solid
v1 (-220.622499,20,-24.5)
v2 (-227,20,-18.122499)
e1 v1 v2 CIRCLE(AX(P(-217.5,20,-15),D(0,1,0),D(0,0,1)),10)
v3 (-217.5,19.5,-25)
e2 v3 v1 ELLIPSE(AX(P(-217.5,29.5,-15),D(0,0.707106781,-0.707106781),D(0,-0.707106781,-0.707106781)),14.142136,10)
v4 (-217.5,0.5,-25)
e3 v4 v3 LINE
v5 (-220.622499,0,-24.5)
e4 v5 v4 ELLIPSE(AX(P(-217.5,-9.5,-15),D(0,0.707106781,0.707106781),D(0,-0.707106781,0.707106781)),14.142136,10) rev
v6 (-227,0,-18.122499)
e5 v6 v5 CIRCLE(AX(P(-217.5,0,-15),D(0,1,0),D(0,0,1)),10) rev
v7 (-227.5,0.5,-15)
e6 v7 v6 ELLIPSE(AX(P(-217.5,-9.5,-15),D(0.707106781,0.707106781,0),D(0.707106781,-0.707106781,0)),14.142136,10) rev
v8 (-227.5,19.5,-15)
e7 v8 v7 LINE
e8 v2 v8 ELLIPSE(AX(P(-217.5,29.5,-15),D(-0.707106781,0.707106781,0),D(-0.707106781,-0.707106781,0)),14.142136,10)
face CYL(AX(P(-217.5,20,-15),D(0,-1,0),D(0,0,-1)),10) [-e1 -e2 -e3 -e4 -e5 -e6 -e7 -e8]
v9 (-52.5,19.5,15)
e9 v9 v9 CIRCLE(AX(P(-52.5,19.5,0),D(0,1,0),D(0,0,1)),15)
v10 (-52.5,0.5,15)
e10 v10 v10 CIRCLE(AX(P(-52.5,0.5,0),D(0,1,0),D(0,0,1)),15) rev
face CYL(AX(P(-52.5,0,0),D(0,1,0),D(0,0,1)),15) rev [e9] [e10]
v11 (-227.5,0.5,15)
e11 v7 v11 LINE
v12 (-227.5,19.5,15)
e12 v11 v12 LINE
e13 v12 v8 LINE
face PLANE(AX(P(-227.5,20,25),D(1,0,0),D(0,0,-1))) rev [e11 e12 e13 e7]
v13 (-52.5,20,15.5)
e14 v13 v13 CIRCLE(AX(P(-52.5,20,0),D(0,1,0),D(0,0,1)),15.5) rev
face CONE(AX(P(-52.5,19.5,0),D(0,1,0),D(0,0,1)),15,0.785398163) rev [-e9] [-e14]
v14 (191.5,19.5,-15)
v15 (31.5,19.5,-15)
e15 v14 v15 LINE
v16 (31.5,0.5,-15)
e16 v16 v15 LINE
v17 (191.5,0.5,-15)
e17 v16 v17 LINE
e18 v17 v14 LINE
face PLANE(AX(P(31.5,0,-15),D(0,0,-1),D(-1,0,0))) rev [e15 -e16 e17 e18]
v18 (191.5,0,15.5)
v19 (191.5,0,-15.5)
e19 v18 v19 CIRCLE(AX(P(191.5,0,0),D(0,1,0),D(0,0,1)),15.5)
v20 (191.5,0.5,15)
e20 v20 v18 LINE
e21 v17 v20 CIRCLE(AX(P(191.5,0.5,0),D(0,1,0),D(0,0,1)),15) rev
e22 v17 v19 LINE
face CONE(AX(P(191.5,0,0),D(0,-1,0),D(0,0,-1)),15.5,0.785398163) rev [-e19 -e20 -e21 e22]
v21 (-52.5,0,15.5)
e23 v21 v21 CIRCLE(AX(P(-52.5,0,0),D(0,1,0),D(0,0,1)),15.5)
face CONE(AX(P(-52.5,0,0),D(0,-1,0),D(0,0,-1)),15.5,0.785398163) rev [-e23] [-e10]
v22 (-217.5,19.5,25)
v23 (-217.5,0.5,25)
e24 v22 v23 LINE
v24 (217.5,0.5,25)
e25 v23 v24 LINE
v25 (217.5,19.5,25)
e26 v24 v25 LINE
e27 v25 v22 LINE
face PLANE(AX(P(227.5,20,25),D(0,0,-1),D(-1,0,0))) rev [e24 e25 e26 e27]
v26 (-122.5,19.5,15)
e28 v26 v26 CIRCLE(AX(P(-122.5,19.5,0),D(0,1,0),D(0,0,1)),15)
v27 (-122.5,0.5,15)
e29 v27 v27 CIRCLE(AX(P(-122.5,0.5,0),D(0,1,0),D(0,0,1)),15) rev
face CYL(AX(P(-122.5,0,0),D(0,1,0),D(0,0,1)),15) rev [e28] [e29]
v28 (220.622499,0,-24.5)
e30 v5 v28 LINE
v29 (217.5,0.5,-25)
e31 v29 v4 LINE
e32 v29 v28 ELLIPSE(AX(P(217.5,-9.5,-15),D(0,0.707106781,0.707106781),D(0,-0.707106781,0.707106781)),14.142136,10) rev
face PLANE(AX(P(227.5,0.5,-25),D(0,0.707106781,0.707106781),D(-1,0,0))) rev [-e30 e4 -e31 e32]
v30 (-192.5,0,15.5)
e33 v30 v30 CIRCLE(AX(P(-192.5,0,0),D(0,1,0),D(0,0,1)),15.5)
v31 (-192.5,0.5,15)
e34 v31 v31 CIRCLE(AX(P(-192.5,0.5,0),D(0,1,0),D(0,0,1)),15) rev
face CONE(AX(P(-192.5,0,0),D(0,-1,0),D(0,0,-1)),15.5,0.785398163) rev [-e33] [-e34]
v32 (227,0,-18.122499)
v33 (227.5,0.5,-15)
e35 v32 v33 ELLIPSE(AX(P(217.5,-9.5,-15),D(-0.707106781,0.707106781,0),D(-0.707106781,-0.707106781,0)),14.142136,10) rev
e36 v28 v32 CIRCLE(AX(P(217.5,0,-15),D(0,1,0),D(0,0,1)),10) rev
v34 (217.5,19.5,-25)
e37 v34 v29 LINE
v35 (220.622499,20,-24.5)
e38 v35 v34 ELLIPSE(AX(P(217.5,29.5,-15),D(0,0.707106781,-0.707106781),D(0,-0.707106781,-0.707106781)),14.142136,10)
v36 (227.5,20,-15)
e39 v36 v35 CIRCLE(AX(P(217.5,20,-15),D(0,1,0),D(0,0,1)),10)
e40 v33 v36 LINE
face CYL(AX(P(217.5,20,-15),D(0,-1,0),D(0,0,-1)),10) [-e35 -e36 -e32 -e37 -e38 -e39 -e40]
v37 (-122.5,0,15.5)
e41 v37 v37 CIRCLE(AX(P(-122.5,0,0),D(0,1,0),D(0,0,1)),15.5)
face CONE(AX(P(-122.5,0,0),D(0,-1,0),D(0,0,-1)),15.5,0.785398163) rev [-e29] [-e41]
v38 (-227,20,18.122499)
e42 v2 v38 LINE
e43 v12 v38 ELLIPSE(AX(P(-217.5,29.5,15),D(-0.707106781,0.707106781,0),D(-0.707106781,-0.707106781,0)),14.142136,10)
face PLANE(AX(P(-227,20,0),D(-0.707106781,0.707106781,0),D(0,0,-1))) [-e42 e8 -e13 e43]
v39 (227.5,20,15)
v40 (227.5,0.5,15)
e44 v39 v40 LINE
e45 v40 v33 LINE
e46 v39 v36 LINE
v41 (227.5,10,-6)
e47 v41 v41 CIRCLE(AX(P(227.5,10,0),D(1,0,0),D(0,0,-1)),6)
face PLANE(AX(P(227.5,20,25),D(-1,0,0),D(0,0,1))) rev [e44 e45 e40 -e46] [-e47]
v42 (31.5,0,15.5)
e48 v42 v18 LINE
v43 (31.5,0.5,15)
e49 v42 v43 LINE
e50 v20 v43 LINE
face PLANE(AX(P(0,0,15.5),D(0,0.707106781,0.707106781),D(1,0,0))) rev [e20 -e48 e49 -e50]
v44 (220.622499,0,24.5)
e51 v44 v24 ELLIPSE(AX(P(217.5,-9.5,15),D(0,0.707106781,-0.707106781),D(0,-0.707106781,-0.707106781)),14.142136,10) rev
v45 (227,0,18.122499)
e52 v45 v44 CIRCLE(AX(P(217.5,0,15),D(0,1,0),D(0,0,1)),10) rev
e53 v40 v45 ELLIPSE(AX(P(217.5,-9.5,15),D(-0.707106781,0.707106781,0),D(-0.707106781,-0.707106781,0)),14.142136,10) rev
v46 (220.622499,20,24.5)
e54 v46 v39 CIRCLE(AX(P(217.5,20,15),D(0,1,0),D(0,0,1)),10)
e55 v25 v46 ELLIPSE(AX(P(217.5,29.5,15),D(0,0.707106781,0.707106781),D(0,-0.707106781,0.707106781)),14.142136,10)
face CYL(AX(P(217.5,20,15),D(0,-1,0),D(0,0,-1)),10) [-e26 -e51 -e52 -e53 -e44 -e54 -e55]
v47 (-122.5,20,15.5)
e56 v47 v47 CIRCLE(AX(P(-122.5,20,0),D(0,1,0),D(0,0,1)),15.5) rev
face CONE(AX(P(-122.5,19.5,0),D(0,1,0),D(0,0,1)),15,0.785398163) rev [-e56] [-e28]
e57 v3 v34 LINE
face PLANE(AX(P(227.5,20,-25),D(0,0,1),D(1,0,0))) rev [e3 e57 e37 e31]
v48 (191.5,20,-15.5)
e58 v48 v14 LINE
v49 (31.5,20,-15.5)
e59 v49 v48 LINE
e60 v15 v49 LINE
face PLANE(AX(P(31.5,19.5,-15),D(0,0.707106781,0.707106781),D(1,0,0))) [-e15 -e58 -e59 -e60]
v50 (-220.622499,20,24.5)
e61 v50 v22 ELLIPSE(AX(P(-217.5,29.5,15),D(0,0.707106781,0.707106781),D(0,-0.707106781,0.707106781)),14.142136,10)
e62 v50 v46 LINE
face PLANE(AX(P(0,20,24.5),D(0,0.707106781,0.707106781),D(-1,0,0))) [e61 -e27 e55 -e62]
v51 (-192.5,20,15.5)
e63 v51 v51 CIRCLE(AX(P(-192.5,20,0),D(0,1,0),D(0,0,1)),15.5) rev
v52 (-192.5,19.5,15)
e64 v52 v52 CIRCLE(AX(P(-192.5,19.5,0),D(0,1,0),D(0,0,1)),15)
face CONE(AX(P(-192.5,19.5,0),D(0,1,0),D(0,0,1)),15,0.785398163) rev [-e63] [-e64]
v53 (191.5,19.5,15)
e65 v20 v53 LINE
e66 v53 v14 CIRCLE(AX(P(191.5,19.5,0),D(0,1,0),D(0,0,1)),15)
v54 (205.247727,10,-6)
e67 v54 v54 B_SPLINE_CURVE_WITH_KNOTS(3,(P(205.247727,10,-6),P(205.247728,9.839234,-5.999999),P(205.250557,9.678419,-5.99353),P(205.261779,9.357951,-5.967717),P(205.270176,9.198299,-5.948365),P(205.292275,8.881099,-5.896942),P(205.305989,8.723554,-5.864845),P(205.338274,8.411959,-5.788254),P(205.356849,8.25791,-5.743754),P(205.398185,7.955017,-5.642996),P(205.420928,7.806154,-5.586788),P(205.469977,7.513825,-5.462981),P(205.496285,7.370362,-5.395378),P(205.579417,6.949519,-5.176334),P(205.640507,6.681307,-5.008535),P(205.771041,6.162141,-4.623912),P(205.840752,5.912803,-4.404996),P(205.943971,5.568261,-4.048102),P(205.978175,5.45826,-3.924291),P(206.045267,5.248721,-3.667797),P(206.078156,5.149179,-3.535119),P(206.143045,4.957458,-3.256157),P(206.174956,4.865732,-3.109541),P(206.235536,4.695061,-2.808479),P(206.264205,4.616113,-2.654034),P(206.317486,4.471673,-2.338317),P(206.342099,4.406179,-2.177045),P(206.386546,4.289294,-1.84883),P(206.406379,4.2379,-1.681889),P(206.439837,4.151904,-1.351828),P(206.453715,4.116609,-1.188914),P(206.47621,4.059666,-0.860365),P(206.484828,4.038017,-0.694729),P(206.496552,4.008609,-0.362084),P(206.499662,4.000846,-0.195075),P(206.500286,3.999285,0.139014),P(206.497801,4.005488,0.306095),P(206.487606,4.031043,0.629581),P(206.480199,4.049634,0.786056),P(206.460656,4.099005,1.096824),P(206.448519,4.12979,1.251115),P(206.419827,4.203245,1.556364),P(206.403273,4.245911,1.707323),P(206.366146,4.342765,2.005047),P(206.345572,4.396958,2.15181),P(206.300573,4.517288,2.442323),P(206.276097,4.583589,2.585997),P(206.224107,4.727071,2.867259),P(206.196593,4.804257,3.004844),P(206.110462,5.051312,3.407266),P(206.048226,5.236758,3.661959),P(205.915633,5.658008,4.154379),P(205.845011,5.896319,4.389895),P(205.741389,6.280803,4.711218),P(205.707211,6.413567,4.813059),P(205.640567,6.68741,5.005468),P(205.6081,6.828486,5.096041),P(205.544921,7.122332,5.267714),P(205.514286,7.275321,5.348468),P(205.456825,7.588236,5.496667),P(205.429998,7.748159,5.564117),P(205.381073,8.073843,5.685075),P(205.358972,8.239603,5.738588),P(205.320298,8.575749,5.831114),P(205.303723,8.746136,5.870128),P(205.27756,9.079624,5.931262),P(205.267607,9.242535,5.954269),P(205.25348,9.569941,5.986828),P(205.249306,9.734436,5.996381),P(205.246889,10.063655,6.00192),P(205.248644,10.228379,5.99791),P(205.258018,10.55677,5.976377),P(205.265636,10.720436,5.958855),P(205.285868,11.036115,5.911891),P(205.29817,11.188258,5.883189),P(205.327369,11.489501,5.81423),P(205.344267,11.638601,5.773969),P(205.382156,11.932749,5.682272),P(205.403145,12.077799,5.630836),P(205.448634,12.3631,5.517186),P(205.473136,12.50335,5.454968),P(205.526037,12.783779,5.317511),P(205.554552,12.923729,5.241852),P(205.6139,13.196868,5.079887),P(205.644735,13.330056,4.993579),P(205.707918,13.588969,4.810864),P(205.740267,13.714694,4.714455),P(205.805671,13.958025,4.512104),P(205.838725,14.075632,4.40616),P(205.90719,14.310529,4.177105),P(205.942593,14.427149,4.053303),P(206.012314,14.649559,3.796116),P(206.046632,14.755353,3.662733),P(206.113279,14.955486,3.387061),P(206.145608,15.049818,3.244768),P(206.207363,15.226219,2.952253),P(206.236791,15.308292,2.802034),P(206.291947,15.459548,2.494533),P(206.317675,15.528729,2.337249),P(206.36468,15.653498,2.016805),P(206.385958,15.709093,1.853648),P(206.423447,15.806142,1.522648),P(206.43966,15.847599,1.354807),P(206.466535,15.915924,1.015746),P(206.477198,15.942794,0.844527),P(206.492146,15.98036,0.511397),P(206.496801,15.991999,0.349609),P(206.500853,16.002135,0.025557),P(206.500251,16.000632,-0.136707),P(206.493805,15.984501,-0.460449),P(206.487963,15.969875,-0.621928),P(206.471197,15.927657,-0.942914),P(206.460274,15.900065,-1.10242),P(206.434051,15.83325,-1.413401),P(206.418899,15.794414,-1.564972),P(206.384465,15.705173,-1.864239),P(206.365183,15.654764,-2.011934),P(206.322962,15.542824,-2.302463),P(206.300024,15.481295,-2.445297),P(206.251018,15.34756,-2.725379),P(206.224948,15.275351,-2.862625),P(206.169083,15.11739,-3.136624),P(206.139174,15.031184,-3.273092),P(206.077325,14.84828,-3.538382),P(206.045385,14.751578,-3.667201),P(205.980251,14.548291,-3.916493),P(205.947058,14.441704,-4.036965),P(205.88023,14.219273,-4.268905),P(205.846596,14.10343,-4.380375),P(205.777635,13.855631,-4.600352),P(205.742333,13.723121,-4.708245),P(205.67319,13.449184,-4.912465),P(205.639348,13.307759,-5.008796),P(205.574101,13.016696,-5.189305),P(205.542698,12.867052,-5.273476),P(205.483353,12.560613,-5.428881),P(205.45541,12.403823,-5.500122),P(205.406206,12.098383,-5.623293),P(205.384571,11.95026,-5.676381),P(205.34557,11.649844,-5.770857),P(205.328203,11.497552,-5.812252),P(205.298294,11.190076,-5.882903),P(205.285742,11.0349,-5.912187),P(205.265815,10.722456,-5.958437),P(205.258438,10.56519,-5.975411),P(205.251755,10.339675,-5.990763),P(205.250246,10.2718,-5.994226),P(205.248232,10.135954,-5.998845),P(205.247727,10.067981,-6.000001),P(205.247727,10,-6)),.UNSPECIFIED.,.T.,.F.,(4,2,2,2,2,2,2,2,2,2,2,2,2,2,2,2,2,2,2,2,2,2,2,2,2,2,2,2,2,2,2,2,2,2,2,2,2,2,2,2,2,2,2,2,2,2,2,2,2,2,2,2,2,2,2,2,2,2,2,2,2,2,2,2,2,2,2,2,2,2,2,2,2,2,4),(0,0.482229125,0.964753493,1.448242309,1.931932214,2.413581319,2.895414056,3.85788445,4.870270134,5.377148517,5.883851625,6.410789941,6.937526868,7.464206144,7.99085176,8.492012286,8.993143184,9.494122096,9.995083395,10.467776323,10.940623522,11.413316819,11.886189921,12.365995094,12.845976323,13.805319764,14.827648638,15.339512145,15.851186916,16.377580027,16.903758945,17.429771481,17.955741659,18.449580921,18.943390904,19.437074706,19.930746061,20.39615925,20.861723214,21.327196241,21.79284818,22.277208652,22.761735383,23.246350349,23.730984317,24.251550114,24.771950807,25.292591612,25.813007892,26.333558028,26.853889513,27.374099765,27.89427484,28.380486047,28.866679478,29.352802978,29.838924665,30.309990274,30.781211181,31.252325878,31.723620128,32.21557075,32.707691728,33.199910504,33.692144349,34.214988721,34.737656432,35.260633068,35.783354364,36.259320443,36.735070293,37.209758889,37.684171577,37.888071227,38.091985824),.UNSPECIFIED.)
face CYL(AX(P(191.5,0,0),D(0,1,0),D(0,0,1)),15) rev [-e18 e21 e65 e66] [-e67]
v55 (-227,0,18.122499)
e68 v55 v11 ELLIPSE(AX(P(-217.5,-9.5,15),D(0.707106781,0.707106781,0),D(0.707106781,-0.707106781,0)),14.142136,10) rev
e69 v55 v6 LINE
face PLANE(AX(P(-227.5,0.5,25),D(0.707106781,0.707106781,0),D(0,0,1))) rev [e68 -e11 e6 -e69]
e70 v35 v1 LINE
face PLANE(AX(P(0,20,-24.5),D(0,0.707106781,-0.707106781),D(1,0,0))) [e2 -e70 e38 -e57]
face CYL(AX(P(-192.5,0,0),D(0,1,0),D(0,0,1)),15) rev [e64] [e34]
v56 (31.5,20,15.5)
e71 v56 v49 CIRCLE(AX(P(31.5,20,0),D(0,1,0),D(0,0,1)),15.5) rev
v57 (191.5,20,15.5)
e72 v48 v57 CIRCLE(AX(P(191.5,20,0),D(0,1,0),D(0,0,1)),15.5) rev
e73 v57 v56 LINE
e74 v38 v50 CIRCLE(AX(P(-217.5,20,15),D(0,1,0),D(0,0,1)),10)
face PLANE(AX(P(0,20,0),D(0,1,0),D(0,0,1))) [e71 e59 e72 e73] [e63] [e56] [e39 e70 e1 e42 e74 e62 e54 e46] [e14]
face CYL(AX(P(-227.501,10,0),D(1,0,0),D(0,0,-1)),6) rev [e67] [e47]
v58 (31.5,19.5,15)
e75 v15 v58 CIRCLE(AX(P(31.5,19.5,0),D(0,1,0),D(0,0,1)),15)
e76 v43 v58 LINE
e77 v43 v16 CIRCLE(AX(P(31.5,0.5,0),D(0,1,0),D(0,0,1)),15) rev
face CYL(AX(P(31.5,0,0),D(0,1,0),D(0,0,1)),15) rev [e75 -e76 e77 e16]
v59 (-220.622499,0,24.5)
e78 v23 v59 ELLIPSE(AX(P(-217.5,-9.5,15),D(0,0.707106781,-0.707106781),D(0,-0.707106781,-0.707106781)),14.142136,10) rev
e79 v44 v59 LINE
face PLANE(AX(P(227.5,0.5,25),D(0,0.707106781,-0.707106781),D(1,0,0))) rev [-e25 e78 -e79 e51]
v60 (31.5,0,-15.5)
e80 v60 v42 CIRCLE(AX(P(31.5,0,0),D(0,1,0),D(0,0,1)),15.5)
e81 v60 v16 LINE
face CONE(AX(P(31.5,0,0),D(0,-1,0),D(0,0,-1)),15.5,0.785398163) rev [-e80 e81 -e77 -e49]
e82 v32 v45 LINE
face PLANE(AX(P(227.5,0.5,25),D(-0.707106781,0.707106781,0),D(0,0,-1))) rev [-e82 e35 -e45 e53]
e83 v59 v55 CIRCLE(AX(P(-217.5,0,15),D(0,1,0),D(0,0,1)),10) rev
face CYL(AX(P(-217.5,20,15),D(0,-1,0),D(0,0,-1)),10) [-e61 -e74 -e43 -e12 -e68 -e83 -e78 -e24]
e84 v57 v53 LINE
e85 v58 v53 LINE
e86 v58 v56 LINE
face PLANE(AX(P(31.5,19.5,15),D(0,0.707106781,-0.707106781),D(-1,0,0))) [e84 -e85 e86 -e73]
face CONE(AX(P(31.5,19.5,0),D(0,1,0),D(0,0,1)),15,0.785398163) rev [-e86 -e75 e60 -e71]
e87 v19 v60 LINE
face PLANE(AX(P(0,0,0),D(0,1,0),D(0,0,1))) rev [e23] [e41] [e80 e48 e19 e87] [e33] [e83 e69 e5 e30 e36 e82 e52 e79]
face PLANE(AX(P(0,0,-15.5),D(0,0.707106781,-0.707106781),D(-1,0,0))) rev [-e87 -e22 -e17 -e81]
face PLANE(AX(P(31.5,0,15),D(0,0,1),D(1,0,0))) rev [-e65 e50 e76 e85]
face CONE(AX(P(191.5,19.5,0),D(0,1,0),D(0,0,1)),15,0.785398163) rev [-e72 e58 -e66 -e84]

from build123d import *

# Parameters (mm, degrees)
SKETCH_1_W               = 455
SKETCH_1_H               = 50
EXTRUDE_1_DEPTH          = 20
SKETCH_2_R               = 15
CUT_EXTRUDE_1_DEPTH      = 230.741702788
CUT_EXTRUDE_2_REACH      = 458.125
CUT_EXTRUDE_2_END_RADIUS = 15
SKETCH_3_R               = 6
CHAMFER_1_SIZE           = 0.5
CHAMFER_2_SIZE           = 0.5
FILLET_1_R               = 10


with BuildPart() as part:
    # 草图1 → 凸台-拉伸1 (new body)
    with BuildSketch(Plane(origin=(0, 0, 0), x_dir=(1, 0, 0), z_dir=(0, 1, 0))):
        Rectangle(SKETCH_1_W, SKETCH_1_H)
    extrude(amount=EXTRUDE_1_DEPTH)

    # 草图2 → 切除-拉伸1 (cut, through all)
    with BuildSketch(Plane(origin=(0, 20, 0), x_dir=(1, 0, 0), z_dir=(0, 1, 0))):
        with Locations(Location((-192.5, 0, 0), (0, 0, 270))):
            Circle(SKETCH_2_R)
        with Locations(Location((-122.5, 0, 0), (0, 0, 270))):
            Circle(SKETCH_2_R)
        with Locations(Location((-52.5, 0, 0), (0, 0, 270))):
            Circle(SKETCH_2_R)
        with BuildLine():
            Line((31.5, 15), (191.5, 15))
            ThreePointArc((191.5, 15), (206.5, 0), (191.5, -15))
            Line((191.5, -15), (31.5, -15))
            ThreePointArc((31.5, -15), (16.5, 0), (31.5, 15))
        make_face()
    extrude(amount=-CUT_EXTRUDE_1_DEPTH, mode=Mode.SUBTRACT)

    # 切除-拉伸2: up to this cylinder (the profile starts outside it)
    cut_extrude_2_end = Plane(origin=(191.5, 10, 0), z_dir=(0, 1, 0)) * Cylinder(CUT_EXTRUDE_2_END_RADIUS, 947.25, mode=Mode.PRIVATE)
    # 草图3 → 切除-拉伸2 (cut, up to the surface)
    with BuildSketch(Plane(origin=(227.5, 0, 0), x_dir=(0, 0, -1), z_dir=(1, 0, 0)), mode=Mode.PRIVATE) as cut_extrude_2_sk1:
        with Locations((0, 10)):
            Circle(SKETCH_3_R)
    cut_extrude_2_tool1 = extrude(cut_extrude_2_sk1.sketch, amount=-CUT_EXTRUDE_2_REACH, mode=Mode.PRIVATE) - cut_extrude_2_end
    add(cut_extrude_2_tool1.solids().sort_by_distance((227.5, 10, 0))[0], mode=Mode.SUBTRACT)

    # 倒角1
    chamfer_1_edges = [part.edges().sort_by_distance(p)[0] for p in [
        (-192.5, 0, -15),
        (-192.5, 20, -15),
        (-122.5, 0, -15),
        (-122.5, 20, -15),
        (-52.5, 0, -15),
        (-52.5, 20, -15),
        (16.5, 0, 0),
        (111.5, 0, -15),
        (206.5, 0, 0),
        (111.5, 0, 15),
        (16.5, 20, 0),
        (111.5, 20, 15),
        (206.5, 20, 0),
        (111.5, 20, -15),
    ]]
    chamfer(chamfer_1_edges, length=CHAMFER_1_SIZE)

    # 倒角2
    chamfer_2_edges = [part.edges().sort_by_distance(p)[0] for p in [
        (0, 20, -25),
        (-227.5, 20, 0),
        (0, 0, -25),
        (227.5, 0, 0),
        (0, 0, 25),
        (-227.5, 0, 0),
        (0, 20, 25),
    ]]
    chamfer(chamfer_2_edges, length=CHAMFER_2_SIZE)

    # 圆角1
    # the kernel refuses this fillet: 10 mm, written as the material it takes off along each edge
    with BuildSketch(Plane(origin=(227.5, -24.5, 25), x_dir=(0, 0, -1), z_dir=(0, 1, 0)), Plane(origin=(227.5, -24.5, -25), x_dir=(-1, 0, 0), z_dir=(0, 1, 0))) as fillet_1_piece_1:
        with BuildLine():
            CenterArc((FILLET_1_R, FILLET_1_R), FILLET_1_R, 180, 90)
            Line((0, FILLET_1_R), (0, 0))
            Line((0, 0), (FILLET_1_R, 0))
        make_face()
    extrude(amount=69, mode=Mode.SUBTRACT)
    with BuildSketch(Plane(origin=(-227.5, -24.5, -25), x_dir=(1, 0, 0), z_dir=(0, 1, 0)), Plane(origin=(-227.5, -24.5, 25), x_dir=(0, 0, -1), z_dir=(0, 1, 0))) as fillet_1_piece_2:
        with BuildLine():
            CenterArc((FILLET_1_R, -FILLET_1_R), FILLET_1_R, 90, 90)
            Line((0, -FILLET_1_R), (0, 0))
            Line((0, 0), (FILLET_1_R, 0))
        make_face()
    extrude(amount=69, mode=Mode.SUBTRACT)


solid = part.part
